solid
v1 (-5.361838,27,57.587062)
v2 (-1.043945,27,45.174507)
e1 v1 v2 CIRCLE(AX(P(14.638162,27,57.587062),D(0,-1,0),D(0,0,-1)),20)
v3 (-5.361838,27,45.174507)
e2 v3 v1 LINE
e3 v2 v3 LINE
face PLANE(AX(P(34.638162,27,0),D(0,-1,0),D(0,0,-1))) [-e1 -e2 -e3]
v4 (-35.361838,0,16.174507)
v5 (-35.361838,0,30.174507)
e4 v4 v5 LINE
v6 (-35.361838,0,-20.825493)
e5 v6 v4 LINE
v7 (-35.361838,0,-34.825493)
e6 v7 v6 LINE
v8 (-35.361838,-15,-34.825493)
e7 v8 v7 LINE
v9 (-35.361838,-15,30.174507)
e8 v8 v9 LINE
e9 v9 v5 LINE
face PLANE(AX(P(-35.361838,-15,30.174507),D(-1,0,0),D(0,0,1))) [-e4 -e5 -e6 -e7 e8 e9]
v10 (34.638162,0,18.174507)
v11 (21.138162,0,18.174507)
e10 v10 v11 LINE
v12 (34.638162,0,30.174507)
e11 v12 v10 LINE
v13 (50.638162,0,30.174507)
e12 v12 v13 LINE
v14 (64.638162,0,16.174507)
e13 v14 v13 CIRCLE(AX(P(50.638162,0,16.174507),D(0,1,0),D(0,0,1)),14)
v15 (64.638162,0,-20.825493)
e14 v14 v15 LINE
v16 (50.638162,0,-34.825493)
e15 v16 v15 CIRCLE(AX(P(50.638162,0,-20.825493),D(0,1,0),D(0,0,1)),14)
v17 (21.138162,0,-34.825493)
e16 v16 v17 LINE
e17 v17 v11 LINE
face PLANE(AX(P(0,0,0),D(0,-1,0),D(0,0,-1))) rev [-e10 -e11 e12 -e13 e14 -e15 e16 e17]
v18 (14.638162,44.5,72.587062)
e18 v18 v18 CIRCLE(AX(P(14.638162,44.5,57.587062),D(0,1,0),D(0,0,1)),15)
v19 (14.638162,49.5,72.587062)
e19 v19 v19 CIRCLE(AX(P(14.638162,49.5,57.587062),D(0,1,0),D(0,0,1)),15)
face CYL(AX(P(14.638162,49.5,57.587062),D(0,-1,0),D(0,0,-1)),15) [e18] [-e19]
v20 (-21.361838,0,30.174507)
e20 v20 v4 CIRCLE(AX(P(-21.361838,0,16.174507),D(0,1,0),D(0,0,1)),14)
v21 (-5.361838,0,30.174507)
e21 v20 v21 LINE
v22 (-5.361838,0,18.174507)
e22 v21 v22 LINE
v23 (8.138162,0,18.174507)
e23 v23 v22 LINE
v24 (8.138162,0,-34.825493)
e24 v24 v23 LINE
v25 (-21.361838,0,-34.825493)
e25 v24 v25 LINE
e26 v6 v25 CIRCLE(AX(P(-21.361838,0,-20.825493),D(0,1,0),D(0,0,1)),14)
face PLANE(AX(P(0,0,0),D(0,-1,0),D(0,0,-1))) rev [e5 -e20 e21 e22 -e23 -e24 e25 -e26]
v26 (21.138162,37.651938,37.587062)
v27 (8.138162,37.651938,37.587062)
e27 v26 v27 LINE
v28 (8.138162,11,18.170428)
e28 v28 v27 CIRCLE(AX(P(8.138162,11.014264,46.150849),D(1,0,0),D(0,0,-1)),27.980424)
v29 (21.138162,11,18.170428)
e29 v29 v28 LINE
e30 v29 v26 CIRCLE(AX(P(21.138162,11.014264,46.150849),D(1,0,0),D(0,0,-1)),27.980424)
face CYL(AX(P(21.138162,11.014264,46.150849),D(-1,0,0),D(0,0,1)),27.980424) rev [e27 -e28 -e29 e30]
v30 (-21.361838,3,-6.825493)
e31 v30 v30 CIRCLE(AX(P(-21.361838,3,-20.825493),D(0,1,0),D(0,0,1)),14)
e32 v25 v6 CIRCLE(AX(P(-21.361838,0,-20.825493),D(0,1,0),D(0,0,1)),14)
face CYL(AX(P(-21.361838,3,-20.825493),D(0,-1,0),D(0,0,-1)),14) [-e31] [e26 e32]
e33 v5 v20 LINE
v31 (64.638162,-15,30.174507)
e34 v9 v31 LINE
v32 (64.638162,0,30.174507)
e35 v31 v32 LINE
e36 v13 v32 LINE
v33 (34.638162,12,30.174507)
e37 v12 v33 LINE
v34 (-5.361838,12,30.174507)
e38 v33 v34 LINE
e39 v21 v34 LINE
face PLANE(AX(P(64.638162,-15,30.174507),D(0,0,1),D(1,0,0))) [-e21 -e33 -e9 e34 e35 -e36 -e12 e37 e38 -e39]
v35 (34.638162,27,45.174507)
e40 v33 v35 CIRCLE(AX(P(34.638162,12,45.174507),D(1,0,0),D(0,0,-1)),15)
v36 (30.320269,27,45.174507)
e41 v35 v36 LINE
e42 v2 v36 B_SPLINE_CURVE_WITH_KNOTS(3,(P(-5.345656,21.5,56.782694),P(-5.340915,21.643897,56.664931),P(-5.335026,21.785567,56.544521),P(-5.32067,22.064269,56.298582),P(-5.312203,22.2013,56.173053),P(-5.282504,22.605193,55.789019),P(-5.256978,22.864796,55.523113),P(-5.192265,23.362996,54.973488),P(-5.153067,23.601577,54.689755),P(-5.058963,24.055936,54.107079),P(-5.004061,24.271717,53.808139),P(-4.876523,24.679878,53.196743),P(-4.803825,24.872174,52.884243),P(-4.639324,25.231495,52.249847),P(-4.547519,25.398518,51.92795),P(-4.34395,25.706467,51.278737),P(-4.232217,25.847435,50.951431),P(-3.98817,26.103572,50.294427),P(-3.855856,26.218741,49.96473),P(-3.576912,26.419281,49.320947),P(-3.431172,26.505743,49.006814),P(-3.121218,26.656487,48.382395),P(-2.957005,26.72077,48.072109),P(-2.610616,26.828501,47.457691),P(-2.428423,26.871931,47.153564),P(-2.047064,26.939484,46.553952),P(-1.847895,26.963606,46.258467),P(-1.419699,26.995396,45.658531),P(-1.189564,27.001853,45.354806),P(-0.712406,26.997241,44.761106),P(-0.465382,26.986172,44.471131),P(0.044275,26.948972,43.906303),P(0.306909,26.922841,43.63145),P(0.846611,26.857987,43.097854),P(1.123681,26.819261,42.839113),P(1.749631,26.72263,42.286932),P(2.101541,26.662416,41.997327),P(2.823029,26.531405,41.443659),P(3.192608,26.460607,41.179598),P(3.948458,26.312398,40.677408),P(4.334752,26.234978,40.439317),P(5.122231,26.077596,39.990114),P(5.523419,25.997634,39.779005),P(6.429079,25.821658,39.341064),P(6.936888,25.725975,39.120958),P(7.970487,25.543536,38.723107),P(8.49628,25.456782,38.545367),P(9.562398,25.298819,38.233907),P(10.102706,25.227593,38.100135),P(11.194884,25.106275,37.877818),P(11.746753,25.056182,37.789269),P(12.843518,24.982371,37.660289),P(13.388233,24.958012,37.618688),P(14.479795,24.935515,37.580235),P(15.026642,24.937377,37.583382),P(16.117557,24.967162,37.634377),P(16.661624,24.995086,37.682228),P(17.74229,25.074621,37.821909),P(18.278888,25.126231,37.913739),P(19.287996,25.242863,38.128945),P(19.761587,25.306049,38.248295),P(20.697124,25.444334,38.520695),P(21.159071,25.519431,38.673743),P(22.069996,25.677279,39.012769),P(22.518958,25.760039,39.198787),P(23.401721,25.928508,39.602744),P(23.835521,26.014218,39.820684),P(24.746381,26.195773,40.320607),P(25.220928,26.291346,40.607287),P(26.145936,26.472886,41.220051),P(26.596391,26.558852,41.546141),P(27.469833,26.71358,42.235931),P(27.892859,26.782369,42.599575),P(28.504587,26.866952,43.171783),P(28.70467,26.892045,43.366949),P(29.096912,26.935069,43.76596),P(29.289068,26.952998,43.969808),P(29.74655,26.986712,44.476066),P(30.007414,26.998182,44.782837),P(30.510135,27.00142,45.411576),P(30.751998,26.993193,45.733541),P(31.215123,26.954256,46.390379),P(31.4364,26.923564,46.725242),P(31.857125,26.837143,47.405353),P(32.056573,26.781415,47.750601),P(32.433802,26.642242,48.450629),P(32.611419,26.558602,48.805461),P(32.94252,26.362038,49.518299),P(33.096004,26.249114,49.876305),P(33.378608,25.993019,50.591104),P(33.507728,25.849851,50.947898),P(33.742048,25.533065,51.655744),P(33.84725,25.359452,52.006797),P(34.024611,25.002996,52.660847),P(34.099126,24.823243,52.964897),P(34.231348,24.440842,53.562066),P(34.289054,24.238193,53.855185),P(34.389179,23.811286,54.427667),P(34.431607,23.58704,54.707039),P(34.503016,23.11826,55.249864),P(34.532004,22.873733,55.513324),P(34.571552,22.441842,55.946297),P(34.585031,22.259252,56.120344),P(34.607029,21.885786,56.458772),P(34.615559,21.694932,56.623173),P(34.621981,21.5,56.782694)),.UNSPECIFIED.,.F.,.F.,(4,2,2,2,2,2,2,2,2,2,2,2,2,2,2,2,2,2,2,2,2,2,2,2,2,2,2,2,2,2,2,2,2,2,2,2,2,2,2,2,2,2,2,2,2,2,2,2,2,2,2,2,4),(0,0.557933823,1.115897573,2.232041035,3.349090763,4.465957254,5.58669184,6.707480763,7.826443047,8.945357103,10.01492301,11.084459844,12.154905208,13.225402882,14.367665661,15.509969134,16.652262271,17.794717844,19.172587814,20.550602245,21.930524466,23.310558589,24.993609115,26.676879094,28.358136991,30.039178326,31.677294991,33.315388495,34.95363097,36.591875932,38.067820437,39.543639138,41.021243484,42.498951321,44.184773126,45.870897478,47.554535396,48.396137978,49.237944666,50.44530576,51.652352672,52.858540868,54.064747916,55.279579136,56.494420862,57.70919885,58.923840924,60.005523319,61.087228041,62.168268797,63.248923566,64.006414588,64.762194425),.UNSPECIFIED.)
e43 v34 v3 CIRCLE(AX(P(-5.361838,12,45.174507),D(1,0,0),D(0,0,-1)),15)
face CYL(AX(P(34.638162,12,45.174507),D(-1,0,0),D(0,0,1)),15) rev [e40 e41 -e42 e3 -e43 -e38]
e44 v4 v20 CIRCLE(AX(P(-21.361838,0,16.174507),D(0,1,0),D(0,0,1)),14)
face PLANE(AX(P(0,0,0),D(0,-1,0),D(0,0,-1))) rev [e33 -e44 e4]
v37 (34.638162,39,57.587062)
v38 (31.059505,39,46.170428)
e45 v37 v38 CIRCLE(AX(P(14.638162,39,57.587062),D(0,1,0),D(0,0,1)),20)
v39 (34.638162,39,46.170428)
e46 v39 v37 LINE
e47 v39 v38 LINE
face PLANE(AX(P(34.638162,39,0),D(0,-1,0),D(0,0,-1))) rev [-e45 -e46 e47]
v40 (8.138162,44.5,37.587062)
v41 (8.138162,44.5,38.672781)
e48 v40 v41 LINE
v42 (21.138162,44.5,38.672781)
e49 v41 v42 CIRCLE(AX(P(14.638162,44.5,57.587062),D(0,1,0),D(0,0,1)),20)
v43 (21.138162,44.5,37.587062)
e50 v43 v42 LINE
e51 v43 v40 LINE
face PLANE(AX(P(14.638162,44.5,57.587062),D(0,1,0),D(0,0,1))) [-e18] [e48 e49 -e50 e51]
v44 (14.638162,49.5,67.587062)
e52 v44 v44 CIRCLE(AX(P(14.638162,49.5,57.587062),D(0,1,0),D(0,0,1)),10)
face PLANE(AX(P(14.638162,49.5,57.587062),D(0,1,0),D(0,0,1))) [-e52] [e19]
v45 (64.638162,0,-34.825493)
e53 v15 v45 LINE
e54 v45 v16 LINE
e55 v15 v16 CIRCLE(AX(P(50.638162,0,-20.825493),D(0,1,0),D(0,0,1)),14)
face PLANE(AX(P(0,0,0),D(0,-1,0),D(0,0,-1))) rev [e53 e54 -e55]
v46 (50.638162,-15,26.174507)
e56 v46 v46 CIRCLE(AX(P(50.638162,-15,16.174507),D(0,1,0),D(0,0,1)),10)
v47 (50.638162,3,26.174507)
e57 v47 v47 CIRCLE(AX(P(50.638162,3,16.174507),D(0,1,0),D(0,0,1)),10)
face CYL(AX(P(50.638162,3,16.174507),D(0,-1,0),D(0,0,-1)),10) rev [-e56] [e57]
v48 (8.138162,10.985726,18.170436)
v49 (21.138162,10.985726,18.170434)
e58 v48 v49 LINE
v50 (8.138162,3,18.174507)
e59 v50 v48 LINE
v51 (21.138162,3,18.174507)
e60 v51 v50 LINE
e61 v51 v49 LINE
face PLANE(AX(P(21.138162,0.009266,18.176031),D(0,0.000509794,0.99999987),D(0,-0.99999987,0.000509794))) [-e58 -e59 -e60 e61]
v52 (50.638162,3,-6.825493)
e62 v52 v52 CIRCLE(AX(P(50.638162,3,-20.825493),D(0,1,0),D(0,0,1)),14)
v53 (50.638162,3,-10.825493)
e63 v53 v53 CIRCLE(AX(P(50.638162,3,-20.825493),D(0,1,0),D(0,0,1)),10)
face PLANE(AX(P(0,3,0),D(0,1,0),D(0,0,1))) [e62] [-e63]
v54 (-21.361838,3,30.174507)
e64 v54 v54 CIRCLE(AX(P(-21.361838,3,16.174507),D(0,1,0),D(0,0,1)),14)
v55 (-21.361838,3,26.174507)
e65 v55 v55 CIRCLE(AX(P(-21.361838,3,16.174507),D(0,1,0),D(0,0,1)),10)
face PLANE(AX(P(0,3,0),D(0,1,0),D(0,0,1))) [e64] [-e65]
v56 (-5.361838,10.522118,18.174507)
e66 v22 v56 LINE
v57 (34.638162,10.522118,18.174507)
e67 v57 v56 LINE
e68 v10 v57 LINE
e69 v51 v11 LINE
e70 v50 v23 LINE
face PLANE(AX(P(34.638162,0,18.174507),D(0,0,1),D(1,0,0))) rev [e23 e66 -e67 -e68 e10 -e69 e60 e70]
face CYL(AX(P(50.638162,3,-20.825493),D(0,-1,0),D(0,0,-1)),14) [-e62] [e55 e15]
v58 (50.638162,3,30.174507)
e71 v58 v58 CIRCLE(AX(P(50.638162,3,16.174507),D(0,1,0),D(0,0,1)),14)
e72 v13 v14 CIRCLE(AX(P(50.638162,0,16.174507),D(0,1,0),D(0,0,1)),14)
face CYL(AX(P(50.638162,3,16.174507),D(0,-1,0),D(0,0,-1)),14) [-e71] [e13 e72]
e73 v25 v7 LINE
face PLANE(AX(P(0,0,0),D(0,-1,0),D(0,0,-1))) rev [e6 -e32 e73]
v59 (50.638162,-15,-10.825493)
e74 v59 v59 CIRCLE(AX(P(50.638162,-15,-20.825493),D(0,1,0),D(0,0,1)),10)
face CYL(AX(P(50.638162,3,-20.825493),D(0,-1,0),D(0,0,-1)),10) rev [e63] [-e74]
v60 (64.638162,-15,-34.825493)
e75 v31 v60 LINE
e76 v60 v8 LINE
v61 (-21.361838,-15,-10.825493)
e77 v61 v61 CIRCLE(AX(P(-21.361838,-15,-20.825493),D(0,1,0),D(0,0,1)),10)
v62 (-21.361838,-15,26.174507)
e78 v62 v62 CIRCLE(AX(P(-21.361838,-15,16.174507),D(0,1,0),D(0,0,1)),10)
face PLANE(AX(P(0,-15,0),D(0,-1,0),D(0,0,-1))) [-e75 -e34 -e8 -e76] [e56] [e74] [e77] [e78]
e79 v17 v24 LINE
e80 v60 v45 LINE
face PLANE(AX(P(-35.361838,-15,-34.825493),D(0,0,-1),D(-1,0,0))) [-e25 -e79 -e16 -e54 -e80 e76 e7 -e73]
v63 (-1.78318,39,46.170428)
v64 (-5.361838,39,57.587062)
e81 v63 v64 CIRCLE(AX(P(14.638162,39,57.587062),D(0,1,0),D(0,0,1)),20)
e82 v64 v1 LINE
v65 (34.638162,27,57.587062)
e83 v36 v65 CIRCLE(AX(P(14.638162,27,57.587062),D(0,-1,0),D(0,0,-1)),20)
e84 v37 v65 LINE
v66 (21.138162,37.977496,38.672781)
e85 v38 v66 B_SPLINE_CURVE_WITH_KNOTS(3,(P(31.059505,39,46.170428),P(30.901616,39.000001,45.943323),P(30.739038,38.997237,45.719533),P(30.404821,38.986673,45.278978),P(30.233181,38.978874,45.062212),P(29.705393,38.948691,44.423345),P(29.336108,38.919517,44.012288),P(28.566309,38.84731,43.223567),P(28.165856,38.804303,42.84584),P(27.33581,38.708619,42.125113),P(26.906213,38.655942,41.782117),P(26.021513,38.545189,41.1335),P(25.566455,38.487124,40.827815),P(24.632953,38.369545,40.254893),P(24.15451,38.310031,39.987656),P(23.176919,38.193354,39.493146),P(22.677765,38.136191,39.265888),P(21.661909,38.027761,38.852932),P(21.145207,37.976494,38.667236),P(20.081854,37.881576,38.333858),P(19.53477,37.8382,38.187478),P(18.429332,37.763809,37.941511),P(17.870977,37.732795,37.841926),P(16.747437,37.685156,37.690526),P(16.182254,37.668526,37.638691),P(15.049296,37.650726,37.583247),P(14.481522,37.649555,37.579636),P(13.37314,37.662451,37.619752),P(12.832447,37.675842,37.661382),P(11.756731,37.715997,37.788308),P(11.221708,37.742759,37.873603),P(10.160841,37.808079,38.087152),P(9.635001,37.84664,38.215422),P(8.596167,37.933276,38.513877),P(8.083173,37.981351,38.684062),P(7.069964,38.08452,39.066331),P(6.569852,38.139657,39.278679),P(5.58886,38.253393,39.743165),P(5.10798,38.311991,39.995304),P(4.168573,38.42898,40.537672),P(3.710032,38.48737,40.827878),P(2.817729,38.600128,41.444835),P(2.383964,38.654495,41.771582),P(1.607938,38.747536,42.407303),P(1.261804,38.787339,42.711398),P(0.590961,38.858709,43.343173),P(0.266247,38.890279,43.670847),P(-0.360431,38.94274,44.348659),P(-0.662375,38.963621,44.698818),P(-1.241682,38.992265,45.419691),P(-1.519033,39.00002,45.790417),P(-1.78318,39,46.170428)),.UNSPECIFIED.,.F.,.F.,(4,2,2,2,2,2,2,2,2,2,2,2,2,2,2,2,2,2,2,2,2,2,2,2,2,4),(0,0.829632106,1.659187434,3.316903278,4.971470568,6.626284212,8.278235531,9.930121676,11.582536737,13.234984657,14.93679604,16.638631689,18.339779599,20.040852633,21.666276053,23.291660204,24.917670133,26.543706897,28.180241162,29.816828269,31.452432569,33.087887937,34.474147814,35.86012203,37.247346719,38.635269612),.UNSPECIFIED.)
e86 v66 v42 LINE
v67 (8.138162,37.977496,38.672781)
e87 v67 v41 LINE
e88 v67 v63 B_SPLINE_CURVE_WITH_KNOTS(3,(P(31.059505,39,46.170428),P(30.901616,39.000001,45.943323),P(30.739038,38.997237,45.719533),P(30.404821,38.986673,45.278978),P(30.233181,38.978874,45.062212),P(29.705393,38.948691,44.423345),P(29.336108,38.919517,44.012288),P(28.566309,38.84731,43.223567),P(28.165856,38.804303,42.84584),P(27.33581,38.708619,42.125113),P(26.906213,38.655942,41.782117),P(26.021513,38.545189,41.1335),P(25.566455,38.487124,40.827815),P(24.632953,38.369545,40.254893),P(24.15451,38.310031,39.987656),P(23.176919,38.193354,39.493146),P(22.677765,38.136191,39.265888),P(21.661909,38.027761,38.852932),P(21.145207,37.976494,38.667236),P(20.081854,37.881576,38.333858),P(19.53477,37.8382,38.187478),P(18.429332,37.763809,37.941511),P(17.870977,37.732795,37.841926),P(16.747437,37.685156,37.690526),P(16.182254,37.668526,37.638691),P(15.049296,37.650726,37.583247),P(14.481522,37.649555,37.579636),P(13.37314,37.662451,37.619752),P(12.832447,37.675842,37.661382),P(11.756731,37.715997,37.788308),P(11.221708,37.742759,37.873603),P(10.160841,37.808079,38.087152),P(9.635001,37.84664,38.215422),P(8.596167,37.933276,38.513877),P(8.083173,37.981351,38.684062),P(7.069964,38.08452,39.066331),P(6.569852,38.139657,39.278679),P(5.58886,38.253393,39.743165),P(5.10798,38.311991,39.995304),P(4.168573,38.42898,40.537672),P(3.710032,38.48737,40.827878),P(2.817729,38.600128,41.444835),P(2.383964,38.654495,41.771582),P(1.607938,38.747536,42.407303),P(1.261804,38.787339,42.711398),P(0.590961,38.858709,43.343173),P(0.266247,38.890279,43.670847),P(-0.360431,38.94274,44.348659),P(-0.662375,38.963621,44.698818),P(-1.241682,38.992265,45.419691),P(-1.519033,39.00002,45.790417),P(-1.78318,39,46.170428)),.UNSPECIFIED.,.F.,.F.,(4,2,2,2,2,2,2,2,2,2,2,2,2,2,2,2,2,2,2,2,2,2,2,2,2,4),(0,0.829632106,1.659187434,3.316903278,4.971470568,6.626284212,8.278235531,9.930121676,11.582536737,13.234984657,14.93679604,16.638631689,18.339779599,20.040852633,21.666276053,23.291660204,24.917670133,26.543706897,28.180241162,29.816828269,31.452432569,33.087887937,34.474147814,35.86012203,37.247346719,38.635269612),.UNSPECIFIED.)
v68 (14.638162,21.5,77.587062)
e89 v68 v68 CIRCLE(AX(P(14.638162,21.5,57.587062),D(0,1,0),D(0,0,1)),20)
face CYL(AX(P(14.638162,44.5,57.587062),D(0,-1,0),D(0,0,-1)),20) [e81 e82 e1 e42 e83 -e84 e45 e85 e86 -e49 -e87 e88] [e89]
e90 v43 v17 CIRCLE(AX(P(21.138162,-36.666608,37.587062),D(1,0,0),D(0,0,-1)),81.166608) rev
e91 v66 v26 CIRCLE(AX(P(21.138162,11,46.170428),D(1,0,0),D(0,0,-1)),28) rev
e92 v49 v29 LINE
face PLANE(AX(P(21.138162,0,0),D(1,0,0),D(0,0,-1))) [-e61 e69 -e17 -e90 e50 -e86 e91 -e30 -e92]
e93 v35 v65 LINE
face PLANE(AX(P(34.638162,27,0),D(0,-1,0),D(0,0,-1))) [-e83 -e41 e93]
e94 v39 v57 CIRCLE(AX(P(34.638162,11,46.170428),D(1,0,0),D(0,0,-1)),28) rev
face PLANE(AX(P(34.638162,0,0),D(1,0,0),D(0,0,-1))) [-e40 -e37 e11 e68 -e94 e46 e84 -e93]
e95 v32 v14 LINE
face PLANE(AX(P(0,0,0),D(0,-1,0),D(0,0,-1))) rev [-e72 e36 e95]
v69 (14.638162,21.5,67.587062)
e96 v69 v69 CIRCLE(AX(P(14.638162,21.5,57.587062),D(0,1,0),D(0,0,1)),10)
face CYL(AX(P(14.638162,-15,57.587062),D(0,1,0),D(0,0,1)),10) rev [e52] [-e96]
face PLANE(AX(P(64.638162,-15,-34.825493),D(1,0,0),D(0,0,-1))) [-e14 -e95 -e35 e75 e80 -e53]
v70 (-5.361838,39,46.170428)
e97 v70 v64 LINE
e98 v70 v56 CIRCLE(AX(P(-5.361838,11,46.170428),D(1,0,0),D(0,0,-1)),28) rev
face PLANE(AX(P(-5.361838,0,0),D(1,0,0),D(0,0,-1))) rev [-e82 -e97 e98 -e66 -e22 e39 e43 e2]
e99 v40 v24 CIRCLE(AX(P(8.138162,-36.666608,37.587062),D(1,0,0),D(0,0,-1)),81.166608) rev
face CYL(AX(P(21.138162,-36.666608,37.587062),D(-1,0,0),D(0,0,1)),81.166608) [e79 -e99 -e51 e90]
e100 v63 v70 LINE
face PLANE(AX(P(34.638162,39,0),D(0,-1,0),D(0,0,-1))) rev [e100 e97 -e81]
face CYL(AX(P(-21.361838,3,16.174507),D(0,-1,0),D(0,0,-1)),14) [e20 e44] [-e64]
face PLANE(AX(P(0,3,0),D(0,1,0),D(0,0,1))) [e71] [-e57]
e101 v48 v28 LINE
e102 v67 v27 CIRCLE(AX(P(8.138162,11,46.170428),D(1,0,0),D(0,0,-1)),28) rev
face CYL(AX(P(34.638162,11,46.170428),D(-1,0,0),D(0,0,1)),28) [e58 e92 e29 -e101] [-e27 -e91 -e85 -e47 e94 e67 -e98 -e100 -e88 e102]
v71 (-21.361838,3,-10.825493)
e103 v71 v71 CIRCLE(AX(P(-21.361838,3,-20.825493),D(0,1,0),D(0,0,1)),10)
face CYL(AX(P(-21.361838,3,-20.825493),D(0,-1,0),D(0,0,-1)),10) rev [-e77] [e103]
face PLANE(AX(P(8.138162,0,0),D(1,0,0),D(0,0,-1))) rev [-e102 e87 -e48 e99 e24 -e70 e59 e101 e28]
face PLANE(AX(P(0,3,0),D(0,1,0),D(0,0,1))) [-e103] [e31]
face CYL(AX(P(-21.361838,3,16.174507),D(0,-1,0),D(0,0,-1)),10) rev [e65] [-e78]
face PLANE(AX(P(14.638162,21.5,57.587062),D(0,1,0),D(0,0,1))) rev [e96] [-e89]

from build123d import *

# Parameters (mm, degrees)
SKETCH1_R             = 14
SKETCH1_R_2           = 10
BOSS_EXTRUDE2_DEPTH   = 3
BOSS_EXTRUDE2_2_DEPTH = 3
BOSS_EXTRUDE2_3_DEPTH = 3
BOSS_EXTRUDE2_4_DEPTH = 3
SKETCH2_W             = 100
SKETCH2_H             = 65
BOSS_EXTRUDE3_DEPTH   = 15
BOSS_EXTRUDE4_DEPTH   = 20
SKETCH4_R             = 20
BOSS_EXTRUDE5_DEPTH   = 5.5
BOSS_EXTRUDE6_START   = -23
SKETCH5_R             = 20
BOSS_EXTRUDE6_DEPTH   = 23
SKETCH6_R             = 15
BOSS_EXTRUDE7_DEPTH   = 5
SKETCH7_R             = 10
CUT_EXTRUDE1_DEPTH    = 120.825265291
BOSS_EXTRUDE8_DEPTH   = 6.5
SKETCH13_R            = 10
CUT_EXTRUDE2_DEPTH    = 113.463746168


with BuildPart() as part:
    # Sketch1 → Boss-Extrude2 (new body)
    with BuildSketch(Plane(origin=(0, 0, 0), x_dir=(1, 0, 0), z_dir=(0, 1, 0))):
        with Locations(Location((50.63816244, 20.825493171, 0), (0, 0, 270))):
            Circle(SKETCH1_R)
        with Locations(Location((50.63816244, 20.825493171, 0), (0, 0, 270))):
            Circle(SKETCH1_R_2, mode=Mode.SUBTRACT)
    extrude(amount=BOSS_EXTRUDE2_DEPTH)



with BuildPart() as body_2:
    # Sketch1 → Boss-Extrude2 2 (new body)
    with BuildSketch(Plane(origin=(0, 0, 0), x_dir=(1, 0, 0), z_dir=(0, 1, 0))):
        with Locations(Location((50.63816244, -16.174506829, 0), (0, 0, 270))):
            Circle(SKETCH1_R)
        with Locations(Location((50.63816244, -16.174506829, 0), (0, 0, 270))):
            Circle(SKETCH1_R_2, mode=Mode.SUBTRACT)
    extrude(amount=BOSS_EXTRUDE2_2_DEPTH)


with BuildPart() as body_3:
    # Sketch1 → Boss-Extrude2 3 (new body)
    with BuildSketch(Plane(origin=(0, 0, 0), x_dir=(1, 0, 0), z_dir=(0, 1, 0))):
        with Locations(Location((-21.36183756, 20.825493171, 0), (0, 0, 270))):
            Circle(SKETCH1_R)
        with Locations(Location((-21.36183756, 20.825493171, 0), (0, 0, 270))):
            Circle(SKETCH1_R_2, mode=Mode.SUBTRACT)
    extrude(amount=BOSS_EXTRUDE2_3_DEPTH)


with BuildPart() as body_4:
    # Sketch1 → Boss-Extrude2 4 (new body)
    with BuildSketch(Plane(origin=(0, 0, 0), x_dir=(1, 0, 0), z_dir=(0, 1, 0))):
        with Locations(Location((-21.36183756, -16.174506829, 0), (0, 0, 270))):
            Circle(SKETCH1_R)
        with Locations(Location((-21.36183756, -16.174506829, 0), (0, 0, 270))):
            Circle(SKETCH1_R_2, mode=Mode.SUBTRACT)
    extrude(amount=BOSS_EXTRUDE2_4_DEPTH)


with BuildPart() as part_1:
    add(part.part)

    add(body_2.part)  # Boss-Extrude3 merges body 2

    add(body_3.part)  # Boss-Extrude3 merges body 3

    add(body_4.part)  # Boss-Extrude3 merges body 4
    # Sketch2 → Boss-Extrude3 (add)
    with BuildSketch(Plane(origin=(0, 0, 0), x_dir=(1, 0, 0), z_dir=(0, 1, 0))):
        with Locations((14.63816244, 2.325493171)):
            Rectangle(SKETCH2_W, SKETCH2_H)
    extrude(amount=-BOSS_EXTRUDE3_DEPTH)

    # Sketch3 → Boss-Extrude4 (add, symmetric)
    with BuildSketch(Plane(origin=(14.63816244, 0, 0), x_dir=(0, 0, -1), z_dir=(1, 0, 0))):
        with BuildLine():
            Line((-30.174506829, 12), (-30.174506829, 0))
            Line((-30.174506829, 0), (-18.174506829, 0))
            Line((-18.174506829, 0), (-18.174506829, 10.52211824))
            ThreePointArc((-18.174506829, 10.52211824), (-26.203196706, 30.629306034), (-46.170428478, 39))
            Line((-46.170428478, 39), (-57.587061699, 39))
            Line((-57.587061699, 39), (-57.587061699, 27))
            Line((-57.587061699, 27), (-45.174506829, 27))
            ThreePointArc((-45.174506829, 27), (-34.567905111, 22.606601718), (-30.174506829, 12))
        make_face()
    extrude(amount=BOSS_EXTRUDE4_DEPTH, both=True)

    # Sketch4 → Boss-Extrude5 (add)
    with BuildSketch(Plane(origin=(0, 39, 0), x_dir=(1, 0, 0), z_dir=(0, 1, 0))):
        with Locations(Location((14.63816244, -57.587061699, 0), (0, 0, 145.191759612))):
            Circle(SKETCH4_R)
    extrude(amount=BOSS_EXTRUDE5_DEPTH)

    # Sketch5 → Boss-Extrude6 (add)
    with BuildSketch(Plane(origin=(0, 44.5, 0), x_dir=(1, 0, 0), z_dir=(0, 1, 0)).offset(BOSS_EXTRUDE6_START)):
        with Locations(Location((14.63816244, -57.587061699, 0), (0, 0, 270))):
            Circle(SKETCH5_R)
    extrude(amount=BOSS_EXTRUDE6_DEPTH)

    # Sketch6 → Boss-Extrude7 (add)
    with BuildSketch(Plane(origin=(0, 44.5, 0), x_dir=(1, 0, 0), z_dir=(0, 1, 0))):
        with Locations(Location((14.63816244, -57.587061699, 0), (0, 0, 270))):
            Circle(SKETCH6_R)
    extrude(amount=BOSS_EXTRUDE7_DEPTH)

    # Sketch7 → Cut-Extrude1 (cut, through all)
    with BuildSketch(Plane(origin=(0, 49.5, 0), x_dir=(1, 0, 0), z_dir=(0, 1, 0))):
        with Locations(Location((14.63816244, -57.587061699, 0), (0, 0, 270))):
            Circle(SKETCH7_R)
    extrude(amount=-CUT_EXTRUDE1_DEPTH, mode=Mode.SUBTRACT)


with BuildPart() as boss_extrude8_tool:
    # Sketch12 → Boss-Extrude8 (new, symmetric)
    with BuildSketch(Plane(origin=(14.63816244, 0, 0), x_dir=(0, 0, -1), z_dir=(1, 0, 0))):
        with BuildLine():
            Line((-18.170428478, 11), (-18.174506829, 3))
            Line((-18.174506829, 3), (-18.174506829, 0))
            Line((-18.174506829, 0), (31.654695104, 0))
            Line((31.654695104, 0), (34.825493171, 0))
            ThreePointArc((34.825493171, 0), (4.909491405, 32.485841169), (-37.587061699, 44.5))
            Line((-37.587061699, 44.5), (-42.002826433, 44.5))
            Line((-42.002826433, 44.5), (-42.002826433, 38.688103821))
            ThreePointArc((-42.002826433, 38.688103821), (-39.774060831, 38.259017893), (-37.587061699, 37.651938292))
            ThreePointArc((-37.587061699, 37.651938292), (-23.535561338, 27.490091956), (-18.170428478, 11))
        make_face()
    extrude(amount=BOSS_EXTRUDE8_DEPTH, both=True)


with BuildPart() as part_2:
    add(part_1.part)


with BuildPart() as part_3:
    # Boss-Extrude8: joined with boss_extrude8_tool
    add(part_2.part.fuse(boss_extrude8_tool.part, tol=0.00001))

    # Sketch13 → Cut-Extrude2 (cut, through all)
    with BuildSketch(Plane(origin=(0, 0, 0), x_dir=(1, 0, 0), z_dir=(0, 1, 0))):
        with Locations(Location((-21.36183756, 20.825493171, 0), (0, 0, 270))):
            Circle(SKETCH13_R)
        with Locations(Location((-21.36183756, -16.174506829, 0), (0, 0, 270))):
            Circle(SKETCH13_R)
        with Locations(Location((50.63816244, 20.825493171, 0), (0, 0, 270))):
            Circle(SKETCH13_R)
        with Locations(Location((50.63816244, -16.174506829, 0), (0, 0, 270))):
            Circle(SKETCH13_R)
    extrude(amount=-CUT_EXTRUDE2_DEPTH, mode=Mode.SUBTRACT)


solid = part_3.part
